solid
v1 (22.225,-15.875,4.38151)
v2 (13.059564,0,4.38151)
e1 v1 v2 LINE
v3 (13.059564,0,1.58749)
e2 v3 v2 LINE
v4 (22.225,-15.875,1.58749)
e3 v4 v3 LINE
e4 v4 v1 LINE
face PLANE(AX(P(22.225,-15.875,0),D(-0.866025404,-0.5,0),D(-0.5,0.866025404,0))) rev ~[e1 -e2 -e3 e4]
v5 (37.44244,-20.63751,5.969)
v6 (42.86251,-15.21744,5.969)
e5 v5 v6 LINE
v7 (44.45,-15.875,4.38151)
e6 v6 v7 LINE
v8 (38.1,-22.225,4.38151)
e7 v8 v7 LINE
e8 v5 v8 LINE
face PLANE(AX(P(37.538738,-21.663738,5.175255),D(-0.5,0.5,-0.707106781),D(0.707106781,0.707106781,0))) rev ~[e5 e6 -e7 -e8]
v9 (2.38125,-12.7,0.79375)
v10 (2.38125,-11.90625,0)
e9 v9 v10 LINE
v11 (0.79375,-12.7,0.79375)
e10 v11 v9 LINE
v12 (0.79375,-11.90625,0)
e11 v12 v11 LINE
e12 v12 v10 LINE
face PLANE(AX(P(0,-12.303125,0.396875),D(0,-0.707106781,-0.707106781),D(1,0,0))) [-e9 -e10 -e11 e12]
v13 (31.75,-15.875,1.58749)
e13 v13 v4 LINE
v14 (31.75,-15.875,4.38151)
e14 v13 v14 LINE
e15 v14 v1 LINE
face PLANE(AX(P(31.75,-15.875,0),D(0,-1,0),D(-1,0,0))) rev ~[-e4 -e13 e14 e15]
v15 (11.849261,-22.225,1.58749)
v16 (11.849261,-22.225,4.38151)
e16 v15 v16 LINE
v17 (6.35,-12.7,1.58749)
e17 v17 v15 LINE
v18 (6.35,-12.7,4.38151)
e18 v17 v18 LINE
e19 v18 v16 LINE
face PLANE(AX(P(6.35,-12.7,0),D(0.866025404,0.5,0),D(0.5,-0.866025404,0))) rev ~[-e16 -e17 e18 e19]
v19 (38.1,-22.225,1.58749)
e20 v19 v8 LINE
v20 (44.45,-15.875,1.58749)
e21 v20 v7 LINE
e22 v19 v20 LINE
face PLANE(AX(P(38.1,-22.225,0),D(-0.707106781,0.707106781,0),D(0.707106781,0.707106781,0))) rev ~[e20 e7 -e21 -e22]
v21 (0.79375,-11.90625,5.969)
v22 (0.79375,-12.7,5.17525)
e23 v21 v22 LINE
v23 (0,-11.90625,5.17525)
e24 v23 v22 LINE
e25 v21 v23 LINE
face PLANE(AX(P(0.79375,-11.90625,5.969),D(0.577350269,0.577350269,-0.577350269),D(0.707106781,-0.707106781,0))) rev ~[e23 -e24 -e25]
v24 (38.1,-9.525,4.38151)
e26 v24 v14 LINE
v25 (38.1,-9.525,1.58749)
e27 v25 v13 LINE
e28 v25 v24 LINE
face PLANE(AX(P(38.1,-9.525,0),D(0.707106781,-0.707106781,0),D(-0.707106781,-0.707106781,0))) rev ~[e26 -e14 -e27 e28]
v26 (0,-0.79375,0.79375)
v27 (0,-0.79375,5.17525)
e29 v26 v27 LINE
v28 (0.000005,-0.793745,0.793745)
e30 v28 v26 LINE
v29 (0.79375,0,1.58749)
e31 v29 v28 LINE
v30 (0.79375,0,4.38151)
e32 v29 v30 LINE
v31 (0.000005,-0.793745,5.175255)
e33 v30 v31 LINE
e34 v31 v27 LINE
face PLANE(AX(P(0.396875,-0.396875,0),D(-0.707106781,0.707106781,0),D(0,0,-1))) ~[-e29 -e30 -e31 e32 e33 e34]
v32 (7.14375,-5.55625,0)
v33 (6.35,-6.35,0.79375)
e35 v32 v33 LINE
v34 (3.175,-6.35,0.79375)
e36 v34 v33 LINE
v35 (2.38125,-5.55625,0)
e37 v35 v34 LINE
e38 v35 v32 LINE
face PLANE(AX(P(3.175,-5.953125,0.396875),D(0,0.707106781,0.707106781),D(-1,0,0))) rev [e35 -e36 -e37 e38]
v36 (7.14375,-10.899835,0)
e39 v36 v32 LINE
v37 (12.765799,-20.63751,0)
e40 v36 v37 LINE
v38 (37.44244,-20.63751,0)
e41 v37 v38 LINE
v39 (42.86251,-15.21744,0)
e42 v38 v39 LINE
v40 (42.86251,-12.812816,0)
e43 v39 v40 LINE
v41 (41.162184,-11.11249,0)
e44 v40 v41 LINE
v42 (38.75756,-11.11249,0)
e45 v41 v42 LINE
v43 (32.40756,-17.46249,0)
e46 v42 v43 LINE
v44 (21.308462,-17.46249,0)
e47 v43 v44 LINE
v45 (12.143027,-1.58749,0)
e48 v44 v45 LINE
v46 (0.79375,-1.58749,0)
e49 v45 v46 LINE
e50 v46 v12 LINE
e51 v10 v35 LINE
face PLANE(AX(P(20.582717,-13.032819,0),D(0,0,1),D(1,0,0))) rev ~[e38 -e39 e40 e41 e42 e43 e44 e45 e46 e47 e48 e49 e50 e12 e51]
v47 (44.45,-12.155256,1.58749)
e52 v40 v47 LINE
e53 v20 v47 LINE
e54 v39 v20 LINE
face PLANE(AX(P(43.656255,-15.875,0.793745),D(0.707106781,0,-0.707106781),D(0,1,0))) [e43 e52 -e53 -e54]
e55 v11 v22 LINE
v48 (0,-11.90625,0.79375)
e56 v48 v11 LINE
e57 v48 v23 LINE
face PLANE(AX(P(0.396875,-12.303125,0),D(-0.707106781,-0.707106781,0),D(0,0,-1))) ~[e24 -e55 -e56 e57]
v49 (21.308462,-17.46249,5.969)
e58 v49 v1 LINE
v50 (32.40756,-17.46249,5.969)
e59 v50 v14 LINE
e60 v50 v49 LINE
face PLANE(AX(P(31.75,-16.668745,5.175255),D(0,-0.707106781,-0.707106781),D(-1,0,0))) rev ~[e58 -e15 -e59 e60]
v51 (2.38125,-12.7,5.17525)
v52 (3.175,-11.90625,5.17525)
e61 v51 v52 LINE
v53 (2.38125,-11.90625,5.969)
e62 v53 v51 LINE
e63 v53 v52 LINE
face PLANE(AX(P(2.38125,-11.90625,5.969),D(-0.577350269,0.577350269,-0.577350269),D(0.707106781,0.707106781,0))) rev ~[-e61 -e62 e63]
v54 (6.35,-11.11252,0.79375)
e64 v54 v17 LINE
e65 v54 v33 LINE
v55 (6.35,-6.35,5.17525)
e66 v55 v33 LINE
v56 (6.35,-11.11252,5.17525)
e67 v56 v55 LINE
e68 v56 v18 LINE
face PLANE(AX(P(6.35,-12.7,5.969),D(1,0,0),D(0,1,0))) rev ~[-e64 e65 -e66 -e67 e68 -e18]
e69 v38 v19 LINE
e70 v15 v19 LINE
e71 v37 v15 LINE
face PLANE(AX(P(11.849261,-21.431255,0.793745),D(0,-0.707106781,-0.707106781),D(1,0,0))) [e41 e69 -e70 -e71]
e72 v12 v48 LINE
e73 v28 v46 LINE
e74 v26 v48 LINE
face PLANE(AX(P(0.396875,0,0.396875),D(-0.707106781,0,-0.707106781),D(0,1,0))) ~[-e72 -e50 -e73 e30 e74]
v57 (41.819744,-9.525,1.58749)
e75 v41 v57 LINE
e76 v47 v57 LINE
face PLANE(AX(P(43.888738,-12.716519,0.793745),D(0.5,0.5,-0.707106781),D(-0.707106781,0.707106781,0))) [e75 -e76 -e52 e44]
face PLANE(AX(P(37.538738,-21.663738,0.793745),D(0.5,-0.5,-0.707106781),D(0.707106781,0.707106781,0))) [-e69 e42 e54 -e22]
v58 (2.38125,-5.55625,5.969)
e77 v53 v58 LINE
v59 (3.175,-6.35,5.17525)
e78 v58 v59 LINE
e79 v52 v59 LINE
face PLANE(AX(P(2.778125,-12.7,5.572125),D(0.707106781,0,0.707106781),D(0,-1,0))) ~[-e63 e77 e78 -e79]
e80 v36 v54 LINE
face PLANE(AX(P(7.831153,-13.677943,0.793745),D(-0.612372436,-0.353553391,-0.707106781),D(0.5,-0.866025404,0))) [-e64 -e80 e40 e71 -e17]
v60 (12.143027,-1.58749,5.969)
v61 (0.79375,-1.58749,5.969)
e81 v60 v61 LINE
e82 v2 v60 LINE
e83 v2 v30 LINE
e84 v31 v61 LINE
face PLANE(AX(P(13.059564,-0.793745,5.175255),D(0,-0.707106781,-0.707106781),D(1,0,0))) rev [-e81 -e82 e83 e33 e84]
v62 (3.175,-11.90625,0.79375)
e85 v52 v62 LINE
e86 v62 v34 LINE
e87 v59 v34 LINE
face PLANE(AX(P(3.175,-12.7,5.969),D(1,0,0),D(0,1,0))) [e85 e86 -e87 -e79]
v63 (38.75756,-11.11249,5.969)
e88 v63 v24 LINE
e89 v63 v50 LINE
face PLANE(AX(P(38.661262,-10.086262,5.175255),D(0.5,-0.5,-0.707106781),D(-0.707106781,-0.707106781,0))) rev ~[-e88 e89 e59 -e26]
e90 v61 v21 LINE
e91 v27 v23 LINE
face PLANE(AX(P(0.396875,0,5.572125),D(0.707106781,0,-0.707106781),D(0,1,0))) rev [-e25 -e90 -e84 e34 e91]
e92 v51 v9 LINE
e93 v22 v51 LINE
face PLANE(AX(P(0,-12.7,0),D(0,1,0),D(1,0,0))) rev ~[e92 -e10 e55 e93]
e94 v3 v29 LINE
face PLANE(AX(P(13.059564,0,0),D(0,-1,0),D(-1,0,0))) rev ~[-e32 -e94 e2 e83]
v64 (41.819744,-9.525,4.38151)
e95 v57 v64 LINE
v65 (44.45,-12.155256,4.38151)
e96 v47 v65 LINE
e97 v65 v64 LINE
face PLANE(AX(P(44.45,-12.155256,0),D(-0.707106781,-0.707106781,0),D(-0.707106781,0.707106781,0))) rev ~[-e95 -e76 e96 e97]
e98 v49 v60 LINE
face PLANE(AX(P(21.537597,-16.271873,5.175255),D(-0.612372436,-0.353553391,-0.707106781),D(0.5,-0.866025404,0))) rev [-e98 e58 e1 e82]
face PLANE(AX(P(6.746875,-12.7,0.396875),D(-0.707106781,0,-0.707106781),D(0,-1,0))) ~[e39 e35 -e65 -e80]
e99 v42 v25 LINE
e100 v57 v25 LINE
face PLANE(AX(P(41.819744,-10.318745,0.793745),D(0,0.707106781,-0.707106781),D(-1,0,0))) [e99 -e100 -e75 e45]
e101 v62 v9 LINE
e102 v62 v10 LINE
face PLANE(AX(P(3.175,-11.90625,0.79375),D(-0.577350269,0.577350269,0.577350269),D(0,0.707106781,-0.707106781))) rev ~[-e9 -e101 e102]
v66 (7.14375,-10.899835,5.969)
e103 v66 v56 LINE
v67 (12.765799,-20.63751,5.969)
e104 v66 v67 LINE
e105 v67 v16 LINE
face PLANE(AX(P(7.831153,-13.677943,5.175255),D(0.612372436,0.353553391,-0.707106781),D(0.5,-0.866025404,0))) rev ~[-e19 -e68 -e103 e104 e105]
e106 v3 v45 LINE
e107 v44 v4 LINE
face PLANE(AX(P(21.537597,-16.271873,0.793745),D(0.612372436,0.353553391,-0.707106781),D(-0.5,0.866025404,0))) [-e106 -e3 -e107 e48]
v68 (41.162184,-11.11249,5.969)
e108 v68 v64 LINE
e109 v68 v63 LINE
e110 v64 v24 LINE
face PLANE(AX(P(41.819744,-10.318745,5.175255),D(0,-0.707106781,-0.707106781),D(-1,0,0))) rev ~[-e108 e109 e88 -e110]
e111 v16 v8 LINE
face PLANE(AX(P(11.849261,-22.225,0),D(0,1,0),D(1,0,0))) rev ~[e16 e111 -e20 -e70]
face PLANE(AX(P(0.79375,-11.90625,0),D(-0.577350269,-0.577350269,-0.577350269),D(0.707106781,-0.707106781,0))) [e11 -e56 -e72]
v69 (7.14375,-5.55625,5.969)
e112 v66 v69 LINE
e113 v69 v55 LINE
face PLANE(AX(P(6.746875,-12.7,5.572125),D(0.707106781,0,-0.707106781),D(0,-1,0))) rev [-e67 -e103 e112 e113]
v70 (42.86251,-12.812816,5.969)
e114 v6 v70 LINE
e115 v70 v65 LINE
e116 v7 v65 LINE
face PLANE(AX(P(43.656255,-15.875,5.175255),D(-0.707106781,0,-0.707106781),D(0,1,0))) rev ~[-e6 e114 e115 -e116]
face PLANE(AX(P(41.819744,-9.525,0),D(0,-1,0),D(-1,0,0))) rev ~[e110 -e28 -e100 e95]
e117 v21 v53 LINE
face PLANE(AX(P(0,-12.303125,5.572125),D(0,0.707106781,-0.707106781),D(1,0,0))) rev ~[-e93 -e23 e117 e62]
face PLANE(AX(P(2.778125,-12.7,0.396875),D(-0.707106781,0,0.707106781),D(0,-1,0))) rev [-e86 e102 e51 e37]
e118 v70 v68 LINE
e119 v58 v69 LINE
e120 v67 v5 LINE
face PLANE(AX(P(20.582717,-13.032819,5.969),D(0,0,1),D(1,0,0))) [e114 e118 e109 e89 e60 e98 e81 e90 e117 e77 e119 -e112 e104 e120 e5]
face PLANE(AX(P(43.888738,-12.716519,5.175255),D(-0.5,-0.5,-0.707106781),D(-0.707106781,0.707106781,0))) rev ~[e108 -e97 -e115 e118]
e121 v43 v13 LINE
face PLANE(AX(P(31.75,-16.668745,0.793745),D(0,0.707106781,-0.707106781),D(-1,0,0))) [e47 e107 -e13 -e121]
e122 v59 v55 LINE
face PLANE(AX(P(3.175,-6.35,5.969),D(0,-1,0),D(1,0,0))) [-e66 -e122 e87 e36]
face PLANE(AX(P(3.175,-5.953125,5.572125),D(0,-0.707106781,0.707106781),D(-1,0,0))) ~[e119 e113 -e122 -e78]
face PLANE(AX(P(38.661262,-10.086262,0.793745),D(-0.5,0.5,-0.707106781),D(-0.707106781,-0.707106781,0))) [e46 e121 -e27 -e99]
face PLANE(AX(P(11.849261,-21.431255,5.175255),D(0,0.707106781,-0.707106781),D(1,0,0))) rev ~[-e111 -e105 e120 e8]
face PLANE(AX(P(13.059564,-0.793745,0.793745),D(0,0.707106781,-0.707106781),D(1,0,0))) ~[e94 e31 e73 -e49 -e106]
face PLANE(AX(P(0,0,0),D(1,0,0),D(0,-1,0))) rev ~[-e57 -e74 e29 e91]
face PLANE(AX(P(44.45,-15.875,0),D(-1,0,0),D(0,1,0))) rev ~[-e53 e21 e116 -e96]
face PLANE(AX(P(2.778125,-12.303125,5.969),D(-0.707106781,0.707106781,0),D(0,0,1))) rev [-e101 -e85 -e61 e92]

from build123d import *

# Parameters (mm, degrees)
F1_DEPTH = 5.969
F2_W     = 3.175
F2_H     = 6.35
F3_DEPTH = 5.97
F4_SIZE  = 0.79375
F5_SIZE  = 1.58749


# Not quite as in the source:
# - a fillet or chamfer is up to 0.001 mm smaller than in the source, because OpenCascade refuses the exact size


with BuildPart() as f1:
    # F0 (on Top) → F1 (new body)
    with BuildSketch(Plane.XY):
        Polygon((13.0595644766, 0), (0, 0), (0, -12.7), (6.35, -12.7), (11.849261314, -22.225), (38.1, -22.225), (44.45, -15.875), (44.45, -12.1552561211), (41.8197438789, -9.525), (38.1, -9.525), (31.75, -15.875), (22.225, -15.875), align=None)
    extrude(amount=F1_DEPTH)

    # F2 (on face) → F3 (cut, through all)
    with BuildSketch(Plane.XY.offset(5.969)):
        with Locations((4.7625, -9.525)):
            Rectangle(F2_W, F2_H)
    extrude(amount=-F3_DEPTH, mode=Mode.SUBTRACT)

    # F4
    f4_edges = [f1.edges().sort_by_distance(p)[0] for p in [
        (0, 0, 2.9845),
        (0, -12.7, 2.9845),
        (0, -6.35, 0),
        (0, -6.35, 5.969),
        (1.5875, -12.7, 0),
        (3.175, -12.7, 2.9845),
        (1.5875, -12.7, 5.969),
        (3.175, -9.525, 5.969),
        (3.175, -9.525, 0),
        (4.7625, -6.35, 5.969),
        (6.35, -9.525, 5.969),
        (4.7625, -6.35, 0),
        (6.35, -9.525, 0),
    ]]
    chamfer(f4_edges, length=F4_SIZE)

    # F5 (size 1.5875 in the source; OpenCascade refuses exactly that, so slightly less here)
    f5_edges = [f1.edges().sort_by_distance(p)[0] for p in [
        (6.926657, 0, 0),
        (17.642282, -7.9375, 0),
        (26.9875, -15.875, 0),
        (34.925, -12.7, 0),
        (39.959872, -9.525, 0),
        (43.134872, -10.840128, 0),
        (44.45, -14.015128, 0),
        (41.275, -19.05, 0),
        (24.974631, -22.225, 0),
        (9.496506, -18.149908, 0),
        (9.496506, -18.149908, 5.969),
        (24.974631, -22.225, 5.969),
        (41.275, -19.05, 5.969),
        (44.45, -14.015128, 5.969),
        (43.134872, -10.840128, 5.969),
        (34.925, -12.7, 5.969),
        (39.959872, -9.525, 5.969),
        (26.9875, -15.875, 5.969),
        (17.642282, -7.9375, 5.969),
        (6.926657, 0, 5.969),
    ]]
    chamfer(f5_edges, length=F5_SIZE)


solid = f1.part
